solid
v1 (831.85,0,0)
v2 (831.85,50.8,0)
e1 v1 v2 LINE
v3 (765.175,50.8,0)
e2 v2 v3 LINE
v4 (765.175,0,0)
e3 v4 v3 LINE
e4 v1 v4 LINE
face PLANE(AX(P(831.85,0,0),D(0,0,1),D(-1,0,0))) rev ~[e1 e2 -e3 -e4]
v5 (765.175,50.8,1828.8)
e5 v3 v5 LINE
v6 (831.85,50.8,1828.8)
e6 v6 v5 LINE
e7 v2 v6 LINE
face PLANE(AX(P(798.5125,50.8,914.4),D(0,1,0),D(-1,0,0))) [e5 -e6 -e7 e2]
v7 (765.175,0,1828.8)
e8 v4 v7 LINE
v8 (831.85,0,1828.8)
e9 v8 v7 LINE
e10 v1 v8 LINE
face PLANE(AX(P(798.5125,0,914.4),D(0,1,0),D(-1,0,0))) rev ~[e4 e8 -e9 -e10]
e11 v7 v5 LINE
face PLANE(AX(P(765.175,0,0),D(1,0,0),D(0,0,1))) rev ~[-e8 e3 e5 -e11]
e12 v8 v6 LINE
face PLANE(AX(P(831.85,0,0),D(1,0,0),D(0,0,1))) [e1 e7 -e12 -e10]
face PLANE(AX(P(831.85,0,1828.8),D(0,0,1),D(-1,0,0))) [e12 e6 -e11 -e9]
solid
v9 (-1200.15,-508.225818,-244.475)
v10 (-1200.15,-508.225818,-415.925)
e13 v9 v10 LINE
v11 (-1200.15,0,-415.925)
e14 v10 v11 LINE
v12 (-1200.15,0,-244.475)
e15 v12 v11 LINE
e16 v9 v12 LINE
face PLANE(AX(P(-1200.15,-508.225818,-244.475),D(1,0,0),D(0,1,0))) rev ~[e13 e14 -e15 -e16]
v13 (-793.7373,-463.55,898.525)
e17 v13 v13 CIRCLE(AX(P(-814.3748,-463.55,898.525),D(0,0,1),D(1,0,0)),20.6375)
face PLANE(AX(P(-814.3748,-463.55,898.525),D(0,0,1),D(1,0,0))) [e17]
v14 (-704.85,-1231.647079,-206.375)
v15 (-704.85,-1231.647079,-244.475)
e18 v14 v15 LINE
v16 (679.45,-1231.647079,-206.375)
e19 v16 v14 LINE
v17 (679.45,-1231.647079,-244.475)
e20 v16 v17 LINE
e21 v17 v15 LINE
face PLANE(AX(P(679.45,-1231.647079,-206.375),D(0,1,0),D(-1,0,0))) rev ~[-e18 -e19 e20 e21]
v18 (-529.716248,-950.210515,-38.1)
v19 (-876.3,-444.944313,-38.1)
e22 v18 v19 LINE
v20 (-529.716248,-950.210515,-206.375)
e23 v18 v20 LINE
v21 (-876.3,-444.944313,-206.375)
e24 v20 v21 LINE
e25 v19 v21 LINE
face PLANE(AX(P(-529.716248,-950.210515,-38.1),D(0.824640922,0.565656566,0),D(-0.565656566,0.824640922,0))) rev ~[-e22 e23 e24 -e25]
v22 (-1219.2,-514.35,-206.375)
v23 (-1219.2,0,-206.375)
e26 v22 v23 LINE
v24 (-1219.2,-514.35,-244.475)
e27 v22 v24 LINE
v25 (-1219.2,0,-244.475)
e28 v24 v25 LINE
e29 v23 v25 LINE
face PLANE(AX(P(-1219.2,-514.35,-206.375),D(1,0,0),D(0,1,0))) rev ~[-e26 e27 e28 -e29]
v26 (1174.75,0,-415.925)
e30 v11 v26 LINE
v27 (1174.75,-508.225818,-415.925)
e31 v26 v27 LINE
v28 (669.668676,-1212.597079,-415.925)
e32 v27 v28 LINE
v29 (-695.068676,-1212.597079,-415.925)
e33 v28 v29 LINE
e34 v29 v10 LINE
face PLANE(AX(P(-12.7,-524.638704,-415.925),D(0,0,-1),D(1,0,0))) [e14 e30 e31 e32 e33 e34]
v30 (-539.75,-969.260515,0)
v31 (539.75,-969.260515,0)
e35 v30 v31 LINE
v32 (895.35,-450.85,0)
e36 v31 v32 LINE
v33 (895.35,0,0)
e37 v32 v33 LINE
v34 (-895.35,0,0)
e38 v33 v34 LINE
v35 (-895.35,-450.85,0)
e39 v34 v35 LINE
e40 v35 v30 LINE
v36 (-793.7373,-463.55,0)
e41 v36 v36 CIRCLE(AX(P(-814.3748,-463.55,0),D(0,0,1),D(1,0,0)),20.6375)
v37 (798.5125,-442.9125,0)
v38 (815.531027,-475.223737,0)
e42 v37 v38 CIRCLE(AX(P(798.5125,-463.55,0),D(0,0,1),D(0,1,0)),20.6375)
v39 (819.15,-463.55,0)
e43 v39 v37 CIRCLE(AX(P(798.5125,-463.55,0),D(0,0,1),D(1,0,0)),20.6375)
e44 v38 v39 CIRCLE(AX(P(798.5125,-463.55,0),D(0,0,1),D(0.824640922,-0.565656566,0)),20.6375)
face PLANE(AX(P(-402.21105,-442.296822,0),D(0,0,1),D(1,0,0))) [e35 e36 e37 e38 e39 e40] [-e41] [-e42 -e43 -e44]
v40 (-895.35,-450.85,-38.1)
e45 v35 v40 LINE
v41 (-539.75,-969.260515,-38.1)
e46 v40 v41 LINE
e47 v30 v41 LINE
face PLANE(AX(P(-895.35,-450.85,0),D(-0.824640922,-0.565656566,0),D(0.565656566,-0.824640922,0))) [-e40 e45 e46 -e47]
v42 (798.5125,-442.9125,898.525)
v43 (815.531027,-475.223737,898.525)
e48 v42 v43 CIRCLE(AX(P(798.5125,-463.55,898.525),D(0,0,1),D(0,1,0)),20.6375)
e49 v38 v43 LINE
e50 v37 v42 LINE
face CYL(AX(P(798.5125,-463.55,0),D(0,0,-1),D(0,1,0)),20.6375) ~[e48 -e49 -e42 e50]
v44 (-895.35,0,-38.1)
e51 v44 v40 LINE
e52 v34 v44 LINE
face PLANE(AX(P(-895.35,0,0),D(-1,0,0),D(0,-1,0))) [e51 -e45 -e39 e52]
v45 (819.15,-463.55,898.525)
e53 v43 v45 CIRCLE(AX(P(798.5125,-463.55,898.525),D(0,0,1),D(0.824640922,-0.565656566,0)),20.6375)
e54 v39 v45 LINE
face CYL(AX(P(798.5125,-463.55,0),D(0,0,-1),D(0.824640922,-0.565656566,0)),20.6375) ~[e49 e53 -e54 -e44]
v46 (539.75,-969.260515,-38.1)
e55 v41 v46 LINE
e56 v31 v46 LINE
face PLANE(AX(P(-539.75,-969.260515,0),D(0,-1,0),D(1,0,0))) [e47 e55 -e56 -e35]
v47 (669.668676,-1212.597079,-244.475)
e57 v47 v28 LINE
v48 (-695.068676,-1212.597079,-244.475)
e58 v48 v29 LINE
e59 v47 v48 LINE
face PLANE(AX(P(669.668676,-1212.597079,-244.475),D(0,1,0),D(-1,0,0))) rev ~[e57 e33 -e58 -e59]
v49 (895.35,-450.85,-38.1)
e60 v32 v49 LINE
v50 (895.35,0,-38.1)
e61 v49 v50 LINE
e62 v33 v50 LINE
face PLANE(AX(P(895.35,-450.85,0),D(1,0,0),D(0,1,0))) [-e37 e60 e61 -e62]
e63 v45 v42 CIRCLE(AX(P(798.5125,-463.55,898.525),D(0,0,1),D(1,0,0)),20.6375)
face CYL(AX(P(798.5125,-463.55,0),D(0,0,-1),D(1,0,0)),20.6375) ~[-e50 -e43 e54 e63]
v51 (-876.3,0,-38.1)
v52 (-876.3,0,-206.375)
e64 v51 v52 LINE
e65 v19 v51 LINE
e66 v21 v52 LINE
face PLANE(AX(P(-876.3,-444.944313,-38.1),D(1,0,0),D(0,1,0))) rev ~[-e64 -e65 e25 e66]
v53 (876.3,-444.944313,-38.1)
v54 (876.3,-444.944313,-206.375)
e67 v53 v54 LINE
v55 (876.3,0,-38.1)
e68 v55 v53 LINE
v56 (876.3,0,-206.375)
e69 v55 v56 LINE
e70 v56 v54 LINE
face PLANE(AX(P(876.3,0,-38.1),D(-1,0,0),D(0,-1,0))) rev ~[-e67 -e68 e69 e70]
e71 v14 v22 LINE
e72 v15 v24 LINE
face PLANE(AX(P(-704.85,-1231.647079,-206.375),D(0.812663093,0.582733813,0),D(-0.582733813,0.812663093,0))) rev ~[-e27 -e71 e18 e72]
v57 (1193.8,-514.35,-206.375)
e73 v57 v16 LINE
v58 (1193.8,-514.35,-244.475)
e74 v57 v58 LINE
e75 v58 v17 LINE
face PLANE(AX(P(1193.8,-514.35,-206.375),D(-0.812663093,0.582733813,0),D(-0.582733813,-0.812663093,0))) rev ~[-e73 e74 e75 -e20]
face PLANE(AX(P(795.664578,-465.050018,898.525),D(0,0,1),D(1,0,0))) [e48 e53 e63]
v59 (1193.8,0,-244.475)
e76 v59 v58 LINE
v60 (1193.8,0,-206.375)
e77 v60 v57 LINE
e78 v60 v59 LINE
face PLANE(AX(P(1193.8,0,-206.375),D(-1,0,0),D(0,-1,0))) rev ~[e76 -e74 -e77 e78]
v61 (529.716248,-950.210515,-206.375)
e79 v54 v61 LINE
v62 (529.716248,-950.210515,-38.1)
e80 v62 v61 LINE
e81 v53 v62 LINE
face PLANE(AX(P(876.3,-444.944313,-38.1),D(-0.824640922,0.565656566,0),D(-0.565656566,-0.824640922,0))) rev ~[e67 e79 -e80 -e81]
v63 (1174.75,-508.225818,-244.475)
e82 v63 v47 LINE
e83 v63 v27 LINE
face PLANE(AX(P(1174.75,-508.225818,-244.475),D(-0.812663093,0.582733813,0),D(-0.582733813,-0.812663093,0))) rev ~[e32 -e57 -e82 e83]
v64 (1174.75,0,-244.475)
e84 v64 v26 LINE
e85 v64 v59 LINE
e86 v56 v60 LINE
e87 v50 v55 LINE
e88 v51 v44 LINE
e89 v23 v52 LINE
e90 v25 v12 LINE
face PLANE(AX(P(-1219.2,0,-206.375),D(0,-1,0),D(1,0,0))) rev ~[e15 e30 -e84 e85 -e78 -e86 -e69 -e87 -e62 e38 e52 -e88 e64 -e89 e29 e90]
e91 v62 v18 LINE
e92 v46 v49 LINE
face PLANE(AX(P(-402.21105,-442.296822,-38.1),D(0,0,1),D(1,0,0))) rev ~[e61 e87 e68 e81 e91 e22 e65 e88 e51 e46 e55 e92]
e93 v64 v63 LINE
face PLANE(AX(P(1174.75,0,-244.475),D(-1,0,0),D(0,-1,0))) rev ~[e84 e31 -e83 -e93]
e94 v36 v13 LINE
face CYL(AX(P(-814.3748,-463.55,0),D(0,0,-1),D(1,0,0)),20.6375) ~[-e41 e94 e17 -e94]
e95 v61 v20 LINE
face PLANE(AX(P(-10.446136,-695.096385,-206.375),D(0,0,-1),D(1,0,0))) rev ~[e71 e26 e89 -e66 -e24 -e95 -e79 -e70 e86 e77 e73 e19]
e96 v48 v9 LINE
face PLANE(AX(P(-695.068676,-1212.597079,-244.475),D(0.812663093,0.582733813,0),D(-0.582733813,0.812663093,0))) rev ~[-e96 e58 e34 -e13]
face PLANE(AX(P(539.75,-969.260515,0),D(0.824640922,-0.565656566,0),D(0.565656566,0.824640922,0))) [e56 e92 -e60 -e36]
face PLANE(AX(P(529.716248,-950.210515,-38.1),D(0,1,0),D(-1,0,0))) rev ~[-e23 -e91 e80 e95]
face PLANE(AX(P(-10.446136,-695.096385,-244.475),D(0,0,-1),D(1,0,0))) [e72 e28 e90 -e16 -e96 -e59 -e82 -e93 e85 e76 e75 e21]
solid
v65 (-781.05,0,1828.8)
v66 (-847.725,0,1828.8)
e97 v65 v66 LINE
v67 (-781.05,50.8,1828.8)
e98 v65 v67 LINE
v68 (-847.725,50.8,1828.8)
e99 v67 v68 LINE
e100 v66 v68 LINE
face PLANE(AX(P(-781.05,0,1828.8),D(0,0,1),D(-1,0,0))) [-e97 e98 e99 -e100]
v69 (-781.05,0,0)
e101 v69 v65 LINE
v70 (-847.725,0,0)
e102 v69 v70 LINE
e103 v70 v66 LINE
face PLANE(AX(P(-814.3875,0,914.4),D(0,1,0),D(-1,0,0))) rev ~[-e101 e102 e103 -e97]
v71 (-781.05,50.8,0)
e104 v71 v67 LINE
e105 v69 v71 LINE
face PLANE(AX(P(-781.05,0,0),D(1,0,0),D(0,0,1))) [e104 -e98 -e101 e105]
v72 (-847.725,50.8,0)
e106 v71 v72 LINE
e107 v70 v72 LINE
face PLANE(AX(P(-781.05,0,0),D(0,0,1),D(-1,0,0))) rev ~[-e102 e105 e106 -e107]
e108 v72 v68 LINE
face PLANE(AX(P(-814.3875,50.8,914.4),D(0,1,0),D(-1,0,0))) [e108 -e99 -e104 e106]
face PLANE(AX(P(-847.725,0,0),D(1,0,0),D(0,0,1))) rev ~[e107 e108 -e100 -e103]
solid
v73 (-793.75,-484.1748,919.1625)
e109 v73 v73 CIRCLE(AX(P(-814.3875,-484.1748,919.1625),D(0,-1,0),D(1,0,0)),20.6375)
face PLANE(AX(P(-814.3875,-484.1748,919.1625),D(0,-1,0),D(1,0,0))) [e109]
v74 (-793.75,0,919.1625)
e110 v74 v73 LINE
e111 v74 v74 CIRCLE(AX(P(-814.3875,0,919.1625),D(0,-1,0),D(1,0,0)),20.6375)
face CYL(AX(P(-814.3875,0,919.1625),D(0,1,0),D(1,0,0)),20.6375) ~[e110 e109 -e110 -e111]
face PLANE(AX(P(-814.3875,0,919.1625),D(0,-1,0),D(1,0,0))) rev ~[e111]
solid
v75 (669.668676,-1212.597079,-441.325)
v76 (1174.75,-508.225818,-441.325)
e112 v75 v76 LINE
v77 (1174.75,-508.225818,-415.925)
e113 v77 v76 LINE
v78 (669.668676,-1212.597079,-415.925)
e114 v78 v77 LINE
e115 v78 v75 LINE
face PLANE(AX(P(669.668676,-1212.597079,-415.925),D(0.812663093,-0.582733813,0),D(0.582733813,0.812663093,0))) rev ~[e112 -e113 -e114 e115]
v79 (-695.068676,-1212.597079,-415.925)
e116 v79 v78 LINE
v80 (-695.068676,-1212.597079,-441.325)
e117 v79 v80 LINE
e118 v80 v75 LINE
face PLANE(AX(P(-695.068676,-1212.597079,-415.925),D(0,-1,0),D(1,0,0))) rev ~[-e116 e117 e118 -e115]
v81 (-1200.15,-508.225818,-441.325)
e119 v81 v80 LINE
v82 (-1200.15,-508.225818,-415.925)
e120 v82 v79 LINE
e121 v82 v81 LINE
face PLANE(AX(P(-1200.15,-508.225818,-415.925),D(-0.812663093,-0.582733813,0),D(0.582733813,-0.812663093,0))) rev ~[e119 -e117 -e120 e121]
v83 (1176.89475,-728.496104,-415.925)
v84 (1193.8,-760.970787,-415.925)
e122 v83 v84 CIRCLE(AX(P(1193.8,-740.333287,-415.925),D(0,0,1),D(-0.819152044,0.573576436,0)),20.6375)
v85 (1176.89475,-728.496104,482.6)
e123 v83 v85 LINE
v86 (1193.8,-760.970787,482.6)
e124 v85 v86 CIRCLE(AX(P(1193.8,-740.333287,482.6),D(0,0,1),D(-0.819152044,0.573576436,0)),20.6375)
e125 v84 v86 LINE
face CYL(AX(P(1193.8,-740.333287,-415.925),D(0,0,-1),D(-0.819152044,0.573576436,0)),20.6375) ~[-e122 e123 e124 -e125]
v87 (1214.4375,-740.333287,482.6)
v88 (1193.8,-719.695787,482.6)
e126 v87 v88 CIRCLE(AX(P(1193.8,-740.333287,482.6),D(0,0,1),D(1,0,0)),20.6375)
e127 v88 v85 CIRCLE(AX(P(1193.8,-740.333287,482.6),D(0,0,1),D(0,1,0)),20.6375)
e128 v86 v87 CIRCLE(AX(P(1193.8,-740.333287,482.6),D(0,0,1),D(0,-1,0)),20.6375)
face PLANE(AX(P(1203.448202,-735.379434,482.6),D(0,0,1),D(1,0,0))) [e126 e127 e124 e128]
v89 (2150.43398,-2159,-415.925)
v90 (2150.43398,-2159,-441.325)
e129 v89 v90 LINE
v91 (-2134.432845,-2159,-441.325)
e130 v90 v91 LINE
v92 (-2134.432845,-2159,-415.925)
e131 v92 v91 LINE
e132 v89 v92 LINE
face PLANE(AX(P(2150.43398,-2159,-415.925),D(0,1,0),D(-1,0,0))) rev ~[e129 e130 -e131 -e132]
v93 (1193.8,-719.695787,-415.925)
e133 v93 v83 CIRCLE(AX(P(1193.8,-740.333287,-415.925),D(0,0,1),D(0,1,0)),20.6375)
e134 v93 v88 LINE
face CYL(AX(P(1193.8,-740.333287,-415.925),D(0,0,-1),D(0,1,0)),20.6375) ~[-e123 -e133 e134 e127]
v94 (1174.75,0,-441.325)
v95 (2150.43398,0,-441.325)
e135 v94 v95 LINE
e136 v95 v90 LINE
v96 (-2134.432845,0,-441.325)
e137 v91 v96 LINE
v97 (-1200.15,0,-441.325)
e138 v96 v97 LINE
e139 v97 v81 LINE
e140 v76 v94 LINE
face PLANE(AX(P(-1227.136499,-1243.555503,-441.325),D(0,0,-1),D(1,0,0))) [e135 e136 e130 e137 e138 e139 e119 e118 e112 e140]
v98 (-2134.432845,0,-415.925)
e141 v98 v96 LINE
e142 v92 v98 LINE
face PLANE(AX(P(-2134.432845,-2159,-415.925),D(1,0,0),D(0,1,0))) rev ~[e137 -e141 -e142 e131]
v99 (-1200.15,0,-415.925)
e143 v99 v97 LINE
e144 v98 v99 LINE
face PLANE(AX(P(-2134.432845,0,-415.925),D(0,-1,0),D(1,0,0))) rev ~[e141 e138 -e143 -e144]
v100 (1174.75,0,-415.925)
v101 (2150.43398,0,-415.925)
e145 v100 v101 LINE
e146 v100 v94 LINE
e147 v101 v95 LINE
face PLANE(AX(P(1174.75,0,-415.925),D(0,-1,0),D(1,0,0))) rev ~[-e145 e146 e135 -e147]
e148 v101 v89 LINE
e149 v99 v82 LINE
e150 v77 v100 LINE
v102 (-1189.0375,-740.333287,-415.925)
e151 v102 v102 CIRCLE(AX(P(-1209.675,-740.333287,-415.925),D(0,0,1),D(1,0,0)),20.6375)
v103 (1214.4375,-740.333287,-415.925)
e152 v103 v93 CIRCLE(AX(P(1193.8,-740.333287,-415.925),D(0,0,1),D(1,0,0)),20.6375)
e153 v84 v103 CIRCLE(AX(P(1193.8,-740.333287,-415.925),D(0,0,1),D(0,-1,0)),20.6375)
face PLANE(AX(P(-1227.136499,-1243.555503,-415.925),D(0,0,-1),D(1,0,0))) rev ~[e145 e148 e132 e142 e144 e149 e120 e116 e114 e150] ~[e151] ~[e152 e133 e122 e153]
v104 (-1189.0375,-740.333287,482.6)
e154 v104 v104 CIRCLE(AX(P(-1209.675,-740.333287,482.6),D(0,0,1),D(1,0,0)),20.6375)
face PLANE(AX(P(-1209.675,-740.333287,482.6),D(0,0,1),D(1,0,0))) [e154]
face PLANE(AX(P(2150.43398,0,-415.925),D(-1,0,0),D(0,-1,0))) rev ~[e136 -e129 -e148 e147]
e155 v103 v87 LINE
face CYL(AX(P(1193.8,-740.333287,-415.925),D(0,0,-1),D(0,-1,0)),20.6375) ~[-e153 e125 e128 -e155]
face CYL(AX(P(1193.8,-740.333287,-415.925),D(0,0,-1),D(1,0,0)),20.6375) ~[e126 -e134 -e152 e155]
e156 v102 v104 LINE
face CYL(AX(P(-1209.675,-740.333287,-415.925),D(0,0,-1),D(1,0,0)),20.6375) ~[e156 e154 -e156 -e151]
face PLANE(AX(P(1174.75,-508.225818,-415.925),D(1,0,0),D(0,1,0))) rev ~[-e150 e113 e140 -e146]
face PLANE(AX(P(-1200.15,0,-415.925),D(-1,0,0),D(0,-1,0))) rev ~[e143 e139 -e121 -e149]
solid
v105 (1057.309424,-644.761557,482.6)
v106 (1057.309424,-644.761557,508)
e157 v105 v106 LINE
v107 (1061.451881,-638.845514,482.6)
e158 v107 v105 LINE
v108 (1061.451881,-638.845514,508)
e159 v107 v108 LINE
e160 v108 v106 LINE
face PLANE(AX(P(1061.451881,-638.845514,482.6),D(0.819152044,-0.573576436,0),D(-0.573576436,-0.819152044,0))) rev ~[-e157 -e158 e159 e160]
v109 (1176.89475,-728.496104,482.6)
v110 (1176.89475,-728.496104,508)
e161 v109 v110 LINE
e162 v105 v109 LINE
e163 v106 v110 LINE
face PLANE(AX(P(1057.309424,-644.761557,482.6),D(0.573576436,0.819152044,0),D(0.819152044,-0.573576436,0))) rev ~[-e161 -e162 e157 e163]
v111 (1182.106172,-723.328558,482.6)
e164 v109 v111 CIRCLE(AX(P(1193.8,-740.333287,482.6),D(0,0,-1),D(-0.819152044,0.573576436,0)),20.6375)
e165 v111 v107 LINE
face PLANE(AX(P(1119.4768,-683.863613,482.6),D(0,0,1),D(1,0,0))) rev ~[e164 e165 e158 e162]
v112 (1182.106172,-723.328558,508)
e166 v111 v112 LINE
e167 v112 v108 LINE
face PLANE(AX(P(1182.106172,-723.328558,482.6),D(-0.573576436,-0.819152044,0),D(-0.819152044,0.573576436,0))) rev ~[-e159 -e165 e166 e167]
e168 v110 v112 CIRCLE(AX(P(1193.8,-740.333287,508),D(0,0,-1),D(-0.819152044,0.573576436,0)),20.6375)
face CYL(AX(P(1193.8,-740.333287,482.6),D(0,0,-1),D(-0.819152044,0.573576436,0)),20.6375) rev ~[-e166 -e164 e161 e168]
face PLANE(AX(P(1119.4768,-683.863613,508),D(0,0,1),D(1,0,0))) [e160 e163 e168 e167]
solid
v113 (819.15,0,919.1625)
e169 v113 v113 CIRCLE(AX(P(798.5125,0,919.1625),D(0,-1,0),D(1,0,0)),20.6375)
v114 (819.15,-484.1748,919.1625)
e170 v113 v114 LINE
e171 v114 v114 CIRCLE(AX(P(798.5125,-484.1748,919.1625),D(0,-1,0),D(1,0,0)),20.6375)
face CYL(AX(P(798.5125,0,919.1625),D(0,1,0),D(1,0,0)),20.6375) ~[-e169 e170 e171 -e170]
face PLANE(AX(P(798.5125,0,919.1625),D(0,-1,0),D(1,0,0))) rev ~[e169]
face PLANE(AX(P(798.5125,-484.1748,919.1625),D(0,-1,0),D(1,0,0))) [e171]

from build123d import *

# Parameters (mm, degrees)
F1_DEPTH  = 38.1
F3_DEPTH  = 168.275
F5_DEPTH  = 38.1
F7_DEPTH  = 171.45
F9_DEPTH  = 25.4
F10_W     = 66.675
F10_H     = 1828.8
F11_DEPTH = 50.8
F12_R     = 20.6375
F13_DEPTH = 898.525
F18_R     = 20.6375
F19_DEPTH = 898.525
F14_R     = 20.6375
F20_DEPTH = 484.1748
F21_R     = 20.6375
F23_DEPTH = 484.1748
F25_DEPTH = 25.4


# Not quite as in the source:
# - the program builds the solid bodies; features that only make, move or delete a surface that nothing else refers to are left out


with BuildPart() as f1:
    # F0 (on Top) → F1 (new body)
    with BuildSketch(Plane.XY):
        Polygon((0, -969.2605154219), (0, 0), (-895.35, 0), (-895.35, -450.85), (-539.75, -969.2605154219), align=None)
        Polygon((895.35, 0), (0, 0), (0, -969.2605154219), (539.75, -969.2605154219), (895.35, -450.85), align=None)
    extrude(amount=-F1_DEPTH)

    # F2 (on face) → F3 (join)
    with BuildSketch(Plane(origin=(0, 0, -38.1), x_dir=(1, 0, 0), z_dir=(0, 0, -1))):
        Polygon((-876.3, 0), (876.3, 0), (876.3, 444.9443133262), (529.7162480886, 950.2105154219), (-529.7162480886, 950.2105154219), (-876.3, 444.9443133262), align=None)
    extrude(amount=F3_DEPTH)

    # F4 (on face) → F5 (join)
    with BuildSketch(Plane(origin=(0, 0, -206.375), x_dir=(1, 0, 0), z_dir=(0, 0, -1))):
        Polygon((-1219.2, 0), (-876.3, 0), (-876.3, 444.9443133262), (-529.7162480886, 950.2105154219), (529.7162480886, 950.2105154219), (876.3, 444.9443133262), (876.3, 0), (1193.8, 0), (1193.8, 514.35), (679.45, 1231.6470793193), (-704.85, 1231.6470793193), (-1219.2, 514.35), align=None)
        Polygon((-876.3, 0), (0, 0), (876.3, 0), (876.3, 444.9443133262), (529.7162480886, 950.2105154219), (-529.7162480886, 950.2105154219), (-876.3, 444.9443133262), align=None)
    extrude(amount=F5_DEPTH)

    # F6 (on face) → F7 (join)
    with BuildSketch(Plane(origin=(0, 0, -244.475), x_dir=(1, 0, 0), z_dir=(0, 0, -1))):
        Polygon((1174.75, 0), (1174.75, 508.2258177526), (669.6686761911, 1212.5970793193), (-695.0686761911, 1212.5970793193), (-1200.15, 508.2258177526), (-1200.15, 0), align=None)
    extrude(amount=F7_DEPTH)

    # F12 (on face) → F13 (join)
    with BuildSketch(Plane.XY):
        with BuildLine():
            Line((798.5125, -463.55), (798.5125, -442.9125))
            ThreePointArc((798.5125, -442.9125), (780.2529386512, -473.1674230228), (815.5310270214, -475.2237373737))
            Line((815.5310270214, -475.2237373737), (798.5125, -463.55))
        make_face()
        with BuildLine():
            ThreePointArc((815.5310270214, -475.2237373737), (818.2245046882, -469.6609146143), (819.15, -463.55))
            ThreePointArc((819.15, -463.55), (813.1054161967, -448.9570838033), (798.5125, -442.9125))
            Line((798.5125, -442.9125), (798.5125, -463.55))
            Line((798.5125, -463.55), (815.5310270214, -475.2237373737))
        make_face()
        with Locations((-814.3748, -463.55)):
            Circle(F12_R)
    extrude(amount=F13_DEPTH)


with BuildPart() as f9:
    # F8 (on face) → F9 (new body)
    with BuildSketch(Plane(origin=(0, 0, -415.925), x_dir=(1, 0, 0), z_dir=(0, 0, -1))):
        Polygon((-2134.432844689, 0), (-1200.15, 0), (-1200.15, 508.2258177526), (-695.0686761911, 1212.5970793193), (0, 1212.5970793193), (0, 2159), (-2134.432844689, 2159), align=None)
        Polygon((0, 2159), (0, 1212.5970793193), (669.6686761911, 1212.5970793193), (1174.75, 508.2258177526), (1174.75, 0), (2150.4339796972, 0), (2150.4339796972, 2159), align=None)
    extrude(amount=F9_DEPTH)

    # F18 (on face) → F19 (join)
    with BuildSketch(Plane.XY.offset(-415.925)):
        with BuildLine():
            ThreePointArc((1214.4375, -740.3332872601), (1208.3929161967, -725.7403710633), (1193.8, -719.6957872601))
            Line((1193.8, -719.6957872601), (1193.8, -740.3332872601))
            Line((1193.8, -740.3332872601), (1210.705250314, -752.1704709653))
            ThreePointArc((1210.705250314, -752.1704709653), (1213.4823335711, -746.5391031973), (1214.4375, -740.3332872601))
        make_face()
        with BuildLine():
            ThreePointArc((1193.8, -719.6957872601), (1184.2706629944, -722.0276011904), (1176.894749686, -728.4961035549))
            Line((1176.894749686, -728.4961035549), (1193.8, -740.3332872601))
            Line((1193.8, -740.3332872601), (1193.8, -719.6957872601))
        make_face()
        with BuildLine():
            Line((1193.8, -740.3332872601), (1176.894749686, -728.4961035549))
            ThreePointArc((1176.894749686, -728.4961035549), (1175.4943139303, -749.8626242657), (1193.8, -760.9707872601))
            Line((1193.8, -760.9707872601), (1193.8, -740.3332872601))
        make_face()
        with BuildLine():
            Line((1210.705250314, -752.1704709653), (1193.8, -740.3332872601))
            Line((1193.8, -740.3332872601), (1193.8, -760.9707872601))
            ThreePointArc((1193.8, -760.9707872601), (1203.3293370056, -758.6389733298), (1210.705250314, -752.1704709653))
        make_face()
        with Locations((-1209.675, -740.3332872601)):
            Circle(F18_R)
    extrude(amount=F19_DEPTH)


with BuildPart() as f11:
    # F10 (on face) → F11 (new body)
    with BuildSketch(Plane(origin=(0, 0, 0), x_dir=(-1, 0, 0), z_dir=(0, 1, 0))):
        with Locations((814.3875, 914.4)):
            Rectangle(F10_W, F10_H)
    extrude(amount=F11_DEPTH)


with BuildPart() as f11b:
    # F10 (on face) → F11, piece 2 (new body)
    with BuildSketch(Plane(origin=(0, 0, 0), x_dir=(-1, 0, 0), z_dir=(0, 1, 0))):
        with Locations((-798.5125, 914.4)):
            Rectangle(F10_W, F10_H)
    extrude(amount=F11_DEPTH)


with BuildPart() as f20:
    # F14 (on face) → F20 (new body)
    with BuildSketch(Plane.XZ):
        with Locations((798.5125, 919.1625)):
            Circle(F14_R)
    extrude(amount=F20_DEPTH)


with BuildPart() as f23:
    # F21 (on face) → F23 (new body)
    with BuildSketch(Plane.XZ):
        with Locations((-814.3875, 919.1625)):
            Circle(F21_R)
    extrude(amount=F23_DEPTH)


with BuildPart() as f25:
    # F24 (on face) → F25 (new body)
    with BuildSketch(Plane.XY.offset(482.6)):
        with BuildLine():
            Line((1061.451881372, -638.8455143858), (1057.3094238, -644.7615569102))
            Line((1057.3094238, -644.7615569102), (1176.894749686, -728.4961035549))
            ThreePointArc((1176.894749686, -728.4961035549), (1179.2689059117, -725.6788097584), (1182.1061723691, -723.3285584593))
            Line((1182.1061723691, -723.3285584593), (1061.451881372, -638.8455143858))
        make_face()
    extrude(amount=F25_DEPTH)


solid = Compound([f1.part, f9.part, f11.part, f11b.part, f20.part, f23.part, f25.part])
